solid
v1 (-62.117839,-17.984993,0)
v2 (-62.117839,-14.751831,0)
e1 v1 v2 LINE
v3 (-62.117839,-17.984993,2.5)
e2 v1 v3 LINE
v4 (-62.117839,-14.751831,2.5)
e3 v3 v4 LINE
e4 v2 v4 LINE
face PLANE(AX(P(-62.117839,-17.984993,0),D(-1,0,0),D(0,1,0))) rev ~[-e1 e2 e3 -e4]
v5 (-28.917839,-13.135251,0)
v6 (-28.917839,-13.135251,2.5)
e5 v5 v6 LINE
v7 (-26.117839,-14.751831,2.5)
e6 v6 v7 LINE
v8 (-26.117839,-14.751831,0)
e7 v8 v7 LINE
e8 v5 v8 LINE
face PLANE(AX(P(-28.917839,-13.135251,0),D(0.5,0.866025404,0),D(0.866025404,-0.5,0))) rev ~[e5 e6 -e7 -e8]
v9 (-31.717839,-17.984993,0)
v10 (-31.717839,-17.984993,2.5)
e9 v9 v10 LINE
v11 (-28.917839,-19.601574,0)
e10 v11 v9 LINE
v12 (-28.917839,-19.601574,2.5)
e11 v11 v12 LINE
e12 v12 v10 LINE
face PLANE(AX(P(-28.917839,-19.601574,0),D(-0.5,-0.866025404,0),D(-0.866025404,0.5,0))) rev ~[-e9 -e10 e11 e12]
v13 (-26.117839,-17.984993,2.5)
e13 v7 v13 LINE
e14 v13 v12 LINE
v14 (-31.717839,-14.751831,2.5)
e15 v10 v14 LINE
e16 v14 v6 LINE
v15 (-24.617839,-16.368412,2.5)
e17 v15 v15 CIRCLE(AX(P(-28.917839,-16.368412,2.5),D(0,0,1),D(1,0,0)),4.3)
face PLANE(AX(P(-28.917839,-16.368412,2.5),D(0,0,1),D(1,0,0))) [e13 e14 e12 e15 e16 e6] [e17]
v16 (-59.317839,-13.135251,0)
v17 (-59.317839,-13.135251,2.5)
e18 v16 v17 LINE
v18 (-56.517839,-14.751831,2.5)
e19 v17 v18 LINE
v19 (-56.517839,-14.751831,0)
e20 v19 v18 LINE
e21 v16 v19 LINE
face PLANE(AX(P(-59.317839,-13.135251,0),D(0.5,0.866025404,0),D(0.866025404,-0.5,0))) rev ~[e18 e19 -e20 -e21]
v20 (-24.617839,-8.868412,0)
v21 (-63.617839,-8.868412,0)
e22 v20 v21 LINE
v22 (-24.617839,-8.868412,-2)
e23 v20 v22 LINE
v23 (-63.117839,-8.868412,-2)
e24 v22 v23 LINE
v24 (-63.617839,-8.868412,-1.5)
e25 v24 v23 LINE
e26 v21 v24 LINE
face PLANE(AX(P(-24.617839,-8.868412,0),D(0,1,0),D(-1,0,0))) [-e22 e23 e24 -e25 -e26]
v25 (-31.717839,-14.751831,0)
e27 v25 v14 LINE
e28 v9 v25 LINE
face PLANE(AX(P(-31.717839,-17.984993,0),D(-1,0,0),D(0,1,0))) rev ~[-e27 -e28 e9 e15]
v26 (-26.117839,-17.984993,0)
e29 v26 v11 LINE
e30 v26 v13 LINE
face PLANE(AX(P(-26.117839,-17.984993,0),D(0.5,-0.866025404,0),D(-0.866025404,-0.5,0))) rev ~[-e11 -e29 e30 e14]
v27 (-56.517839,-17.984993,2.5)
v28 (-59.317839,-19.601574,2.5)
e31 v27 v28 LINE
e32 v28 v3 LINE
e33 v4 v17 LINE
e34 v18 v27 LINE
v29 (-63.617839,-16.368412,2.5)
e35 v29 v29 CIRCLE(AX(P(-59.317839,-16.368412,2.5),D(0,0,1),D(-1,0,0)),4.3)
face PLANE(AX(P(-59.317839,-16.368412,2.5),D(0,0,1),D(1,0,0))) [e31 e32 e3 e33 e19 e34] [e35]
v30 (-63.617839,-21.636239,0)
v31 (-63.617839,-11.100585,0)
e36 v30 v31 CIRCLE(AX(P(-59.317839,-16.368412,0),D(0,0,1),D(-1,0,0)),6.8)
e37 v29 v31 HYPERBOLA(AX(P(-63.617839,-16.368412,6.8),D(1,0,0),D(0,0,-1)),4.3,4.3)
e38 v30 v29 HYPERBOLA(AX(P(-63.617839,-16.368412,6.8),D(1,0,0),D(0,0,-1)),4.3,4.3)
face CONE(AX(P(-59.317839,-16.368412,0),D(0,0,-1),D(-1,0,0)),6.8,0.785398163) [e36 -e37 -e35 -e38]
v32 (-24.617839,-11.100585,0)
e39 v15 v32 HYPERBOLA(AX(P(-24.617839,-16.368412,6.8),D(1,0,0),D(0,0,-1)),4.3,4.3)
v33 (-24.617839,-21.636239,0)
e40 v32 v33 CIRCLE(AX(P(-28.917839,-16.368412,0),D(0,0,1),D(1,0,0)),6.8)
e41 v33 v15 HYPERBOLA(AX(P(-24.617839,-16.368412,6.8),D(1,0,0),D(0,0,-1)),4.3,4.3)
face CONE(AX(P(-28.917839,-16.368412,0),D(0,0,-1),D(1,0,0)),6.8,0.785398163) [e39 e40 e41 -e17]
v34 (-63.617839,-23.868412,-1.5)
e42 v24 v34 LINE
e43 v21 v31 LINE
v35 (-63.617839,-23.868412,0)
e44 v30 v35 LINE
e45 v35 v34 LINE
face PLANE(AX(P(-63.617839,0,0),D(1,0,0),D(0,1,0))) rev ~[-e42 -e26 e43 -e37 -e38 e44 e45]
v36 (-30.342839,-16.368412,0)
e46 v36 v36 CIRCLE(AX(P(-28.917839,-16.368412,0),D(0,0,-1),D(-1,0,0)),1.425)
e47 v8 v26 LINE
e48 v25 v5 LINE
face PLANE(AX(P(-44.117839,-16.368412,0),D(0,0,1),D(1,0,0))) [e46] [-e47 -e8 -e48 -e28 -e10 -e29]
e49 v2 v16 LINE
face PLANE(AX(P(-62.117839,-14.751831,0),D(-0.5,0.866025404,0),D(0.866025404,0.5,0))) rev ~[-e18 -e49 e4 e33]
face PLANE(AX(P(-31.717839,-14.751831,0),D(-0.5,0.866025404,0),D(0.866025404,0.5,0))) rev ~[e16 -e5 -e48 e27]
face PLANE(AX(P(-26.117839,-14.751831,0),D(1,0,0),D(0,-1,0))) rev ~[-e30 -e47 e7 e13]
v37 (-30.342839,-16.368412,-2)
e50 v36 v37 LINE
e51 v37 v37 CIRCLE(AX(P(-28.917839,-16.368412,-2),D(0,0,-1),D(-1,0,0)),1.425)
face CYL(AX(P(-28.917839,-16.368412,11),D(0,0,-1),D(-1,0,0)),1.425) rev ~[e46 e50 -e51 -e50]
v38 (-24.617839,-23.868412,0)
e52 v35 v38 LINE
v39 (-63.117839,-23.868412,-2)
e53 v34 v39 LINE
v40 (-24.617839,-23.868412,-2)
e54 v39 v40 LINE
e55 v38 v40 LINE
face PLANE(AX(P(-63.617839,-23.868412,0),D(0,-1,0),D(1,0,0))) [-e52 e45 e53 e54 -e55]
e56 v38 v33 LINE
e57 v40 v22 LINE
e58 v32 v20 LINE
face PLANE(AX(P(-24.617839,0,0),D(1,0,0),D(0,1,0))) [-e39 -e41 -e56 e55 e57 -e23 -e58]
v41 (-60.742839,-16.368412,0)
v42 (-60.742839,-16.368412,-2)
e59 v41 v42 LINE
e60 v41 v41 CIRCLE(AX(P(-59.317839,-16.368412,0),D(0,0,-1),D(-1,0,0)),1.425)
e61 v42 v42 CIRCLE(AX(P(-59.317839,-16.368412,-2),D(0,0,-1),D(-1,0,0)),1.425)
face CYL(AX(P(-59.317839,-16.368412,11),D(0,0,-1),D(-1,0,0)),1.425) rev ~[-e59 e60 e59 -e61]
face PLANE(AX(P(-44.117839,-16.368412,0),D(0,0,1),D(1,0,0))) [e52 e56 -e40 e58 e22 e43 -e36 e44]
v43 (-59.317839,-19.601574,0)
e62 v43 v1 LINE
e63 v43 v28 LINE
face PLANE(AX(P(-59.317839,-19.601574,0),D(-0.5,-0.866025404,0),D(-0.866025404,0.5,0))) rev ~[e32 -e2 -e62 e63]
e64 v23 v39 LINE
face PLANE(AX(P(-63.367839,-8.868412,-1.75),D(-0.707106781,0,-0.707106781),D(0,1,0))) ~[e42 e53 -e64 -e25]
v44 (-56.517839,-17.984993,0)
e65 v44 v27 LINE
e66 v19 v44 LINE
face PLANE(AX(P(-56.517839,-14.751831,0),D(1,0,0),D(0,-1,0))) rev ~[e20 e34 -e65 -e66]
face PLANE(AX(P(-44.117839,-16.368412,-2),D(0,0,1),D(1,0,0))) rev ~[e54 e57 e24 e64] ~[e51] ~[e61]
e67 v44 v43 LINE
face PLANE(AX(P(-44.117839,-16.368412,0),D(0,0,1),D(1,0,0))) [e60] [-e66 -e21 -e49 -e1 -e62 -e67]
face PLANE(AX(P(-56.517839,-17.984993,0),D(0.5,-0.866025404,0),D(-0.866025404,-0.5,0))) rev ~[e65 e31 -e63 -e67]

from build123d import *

# Parameters (mm, degrees)
F0_R     = 4.3
F1_DEPTH = 2
F2_D     = 2.85
F2_DEPTH = 11
F2_TIP   = 0.8562263821
F3_DEPTH = 2.5
F5_SIZE  = 0.5


# Not quite as in the source:
# - a fillet or chamfer that OpenCascade refuses, or shapes differently, is made with other operations: its cross-section is extruded or revolved along the edge and cut away or added


with BuildPart() as f1:
    # F0 (on Top) → F1 (new body)
    with BuildSketch(Plane.XY):
        Polygon((-24.6178394498, -8.8684120262), (-63.6178394498, -8.8684120262), (-63.6178394498, -16.3684120262), (-63.6178394498, -23.8684120262), (-24.6178394498, -23.8684120262), (-24.6178394498, -16.3684120262), align=None)
        with BuildLine():
            ThreePointArc((-55.0178394498, -16.3684120262), (-59.3178394498, -20.6684120262), (-63.6178394498, -16.3684120262))
            ThreePointArc((-63.6178394498, -16.3684120262), (-59.3178394498, -12.0684120262), (-55.0178394498, -16.3684120262))
        make_face(mode=Mode.SUBTRACT)
        with Locations((-28.9178394498, -16.3684120262)):
            Circle(F0_R, mode=Mode.SUBTRACT)
        with BuildLine():
            ThreePointArc((-55.0178394498, -16.3684120262), (-59.3178394498, -12.0684120262), (-63.6178394498, -16.3684120262))
            ThreePointArc((-63.6178394498, -16.3684120262), (-59.3178394498, -20.6684120262), (-55.0178394498, -16.3684120262))
        make_face()
        Polygon((-59.3178394498, -13.1352505188), (-56.5178394498, -14.7518312725), (-56.5178394498, -17.98499278), (-59.3178394498, -19.6015735337), (-62.1178394498, -17.98499278), (-62.1178394498, -14.7518312725), align=None, mode=Mode.SUBTRACT)
        with Locations((-28.9178394498, -16.3684120262)):
            Circle(F0_R)
        Polygon((-28.9178394498, -13.1352505188), (-26.1178394498, -14.7518312725), (-26.1178394498, -17.98499278), (-28.9178394498, -19.6015735337), (-31.7178394498, -17.98499278), (-31.7178394498, -14.7518312725), align=None, mode=Mode.SUBTRACT)
        Polygon((-56.5178394498, -17.98499278), (-56.5178394498, -14.7518312725), (-59.3178394498, -13.1352505188), (-62.1178394498, -14.7518312725), (-62.1178394498, -17.98499278), (-59.3178394498, -19.6015735337), align=None)
        Polygon((-26.1178394498, -17.98499278), (-26.1178394498, -14.7518312725), (-28.9178394498, -13.1352505188), (-31.7178394498, -14.7518312725), (-31.7178394498, -17.98499278), (-28.9178394498, -19.6015735337), align=None)
    extrude(amount=-F1_DEPTH)

    # F2
    with Locations(Plane.XY):
        with Locations((-59.3178394498, -16.3684120262), (-28.9178394498, -16.3684120262)):
            Hole(F2_D / 2, depth=F2_DEPTH)
            with Locations((0, 0, -(F2_DEPTH + F2_TIP / 2))):  # 118° drill point
                Cone(0, F2_D / 2, F2_TIP, mode=Mode.SUBTRACT)

    # F0 (on Top) → F3 (join)
    with BuildSketch(Plane.XY):
        with BuildLine():
            ThreePointArc((-55.0178394498, -16.3684120262), (-59.3178394498, -12.0684120262), (-63.6178394498, -16.3684120262))
            ThreePointArc((-63.6178394498, -16.3684120262), (-59.3178394498, -20.6684120262), (-55.0178394498, -16.3684120262))
        make_face()
        Polygon((-59.3178394498, -13.1352505188), (-56.5178394498, -14.7518312725), (-56.5178394498, -17.98499278), (-59.3178394498, -19.6015735337), (-62.1178394498, -17.98499278), (-62.1178394498, -14.7518312725), align=None, mode=Mode.SUBTRACT)
        with Locations((-28.9178394498, -16.3684120262)):
            Circle(F0_R)
        Polygon((-28.9178394498, -13.1352505188), (-26.1178394498, -14.7518312725), (-26.1178394498, -17.98499278), (-28.9178394498, -19.6015735337), (-31.7178394498, -17.98499278), (-31.7178394498, -14.7518312725), align=None, mode=Mode.SUBTRACT)
    extrude(amount=F3_DEPTH)

    # F4: chamfer of 2.5 on 2 edges, made by hand


with BuildPart() as f4_tool2:
    # F4_s3 → F4_t4 (revolve)
    with BuildSketch(Plane.XZ.offset(16.3684120262)):
        Polygon((-66.1178394498, 0), (-63.6178394498, 2.5), (-63.6178394498, 0), align=None)
    revolve(axis=Axis((-59.3178394498, -16.3684120262, 0), (0, 0, 1)))

    split(bisect_by=Plane.YZ.offset(-63.6178394498), keep=Keep.TOP)


with BuildPart() as f1_1:
    add(f1.part)

    # F4_t1: union F4_tool2
    add(f4_tool2.part)


with BuildPart() as f4_tool7:
    # F4_s8 → F4_t9 (revolve)
    with BuildSketch(Plane.XZ.offset(16.3684120262)):
        Polygon((-22.1178394498, 0), (-24.6178394498, 2.5), (-24.6178394498, 0), align=None)
    revolve(axis=Axis((-28.9178394498, -16.3684120262, 0), (0, 0, 1)))

    split(bisect_by=Plane.YZ.offset(-24.6178394498), keep=Keep.BOTTOM)


with BuildPart() as f1_2:
    add(f1_1.part)

    # F4_t6: union F4_tool7
    add(f4_tool7.part)

    # F5
    f5_edges = [f1_2.edges().sort_by_distance(p)[0] for p in [
        (-63.617839, -16.368412, -2),
    ]]
    chamfer(f5_edges, length=F5_SIZE)


solid = f1_2.part
